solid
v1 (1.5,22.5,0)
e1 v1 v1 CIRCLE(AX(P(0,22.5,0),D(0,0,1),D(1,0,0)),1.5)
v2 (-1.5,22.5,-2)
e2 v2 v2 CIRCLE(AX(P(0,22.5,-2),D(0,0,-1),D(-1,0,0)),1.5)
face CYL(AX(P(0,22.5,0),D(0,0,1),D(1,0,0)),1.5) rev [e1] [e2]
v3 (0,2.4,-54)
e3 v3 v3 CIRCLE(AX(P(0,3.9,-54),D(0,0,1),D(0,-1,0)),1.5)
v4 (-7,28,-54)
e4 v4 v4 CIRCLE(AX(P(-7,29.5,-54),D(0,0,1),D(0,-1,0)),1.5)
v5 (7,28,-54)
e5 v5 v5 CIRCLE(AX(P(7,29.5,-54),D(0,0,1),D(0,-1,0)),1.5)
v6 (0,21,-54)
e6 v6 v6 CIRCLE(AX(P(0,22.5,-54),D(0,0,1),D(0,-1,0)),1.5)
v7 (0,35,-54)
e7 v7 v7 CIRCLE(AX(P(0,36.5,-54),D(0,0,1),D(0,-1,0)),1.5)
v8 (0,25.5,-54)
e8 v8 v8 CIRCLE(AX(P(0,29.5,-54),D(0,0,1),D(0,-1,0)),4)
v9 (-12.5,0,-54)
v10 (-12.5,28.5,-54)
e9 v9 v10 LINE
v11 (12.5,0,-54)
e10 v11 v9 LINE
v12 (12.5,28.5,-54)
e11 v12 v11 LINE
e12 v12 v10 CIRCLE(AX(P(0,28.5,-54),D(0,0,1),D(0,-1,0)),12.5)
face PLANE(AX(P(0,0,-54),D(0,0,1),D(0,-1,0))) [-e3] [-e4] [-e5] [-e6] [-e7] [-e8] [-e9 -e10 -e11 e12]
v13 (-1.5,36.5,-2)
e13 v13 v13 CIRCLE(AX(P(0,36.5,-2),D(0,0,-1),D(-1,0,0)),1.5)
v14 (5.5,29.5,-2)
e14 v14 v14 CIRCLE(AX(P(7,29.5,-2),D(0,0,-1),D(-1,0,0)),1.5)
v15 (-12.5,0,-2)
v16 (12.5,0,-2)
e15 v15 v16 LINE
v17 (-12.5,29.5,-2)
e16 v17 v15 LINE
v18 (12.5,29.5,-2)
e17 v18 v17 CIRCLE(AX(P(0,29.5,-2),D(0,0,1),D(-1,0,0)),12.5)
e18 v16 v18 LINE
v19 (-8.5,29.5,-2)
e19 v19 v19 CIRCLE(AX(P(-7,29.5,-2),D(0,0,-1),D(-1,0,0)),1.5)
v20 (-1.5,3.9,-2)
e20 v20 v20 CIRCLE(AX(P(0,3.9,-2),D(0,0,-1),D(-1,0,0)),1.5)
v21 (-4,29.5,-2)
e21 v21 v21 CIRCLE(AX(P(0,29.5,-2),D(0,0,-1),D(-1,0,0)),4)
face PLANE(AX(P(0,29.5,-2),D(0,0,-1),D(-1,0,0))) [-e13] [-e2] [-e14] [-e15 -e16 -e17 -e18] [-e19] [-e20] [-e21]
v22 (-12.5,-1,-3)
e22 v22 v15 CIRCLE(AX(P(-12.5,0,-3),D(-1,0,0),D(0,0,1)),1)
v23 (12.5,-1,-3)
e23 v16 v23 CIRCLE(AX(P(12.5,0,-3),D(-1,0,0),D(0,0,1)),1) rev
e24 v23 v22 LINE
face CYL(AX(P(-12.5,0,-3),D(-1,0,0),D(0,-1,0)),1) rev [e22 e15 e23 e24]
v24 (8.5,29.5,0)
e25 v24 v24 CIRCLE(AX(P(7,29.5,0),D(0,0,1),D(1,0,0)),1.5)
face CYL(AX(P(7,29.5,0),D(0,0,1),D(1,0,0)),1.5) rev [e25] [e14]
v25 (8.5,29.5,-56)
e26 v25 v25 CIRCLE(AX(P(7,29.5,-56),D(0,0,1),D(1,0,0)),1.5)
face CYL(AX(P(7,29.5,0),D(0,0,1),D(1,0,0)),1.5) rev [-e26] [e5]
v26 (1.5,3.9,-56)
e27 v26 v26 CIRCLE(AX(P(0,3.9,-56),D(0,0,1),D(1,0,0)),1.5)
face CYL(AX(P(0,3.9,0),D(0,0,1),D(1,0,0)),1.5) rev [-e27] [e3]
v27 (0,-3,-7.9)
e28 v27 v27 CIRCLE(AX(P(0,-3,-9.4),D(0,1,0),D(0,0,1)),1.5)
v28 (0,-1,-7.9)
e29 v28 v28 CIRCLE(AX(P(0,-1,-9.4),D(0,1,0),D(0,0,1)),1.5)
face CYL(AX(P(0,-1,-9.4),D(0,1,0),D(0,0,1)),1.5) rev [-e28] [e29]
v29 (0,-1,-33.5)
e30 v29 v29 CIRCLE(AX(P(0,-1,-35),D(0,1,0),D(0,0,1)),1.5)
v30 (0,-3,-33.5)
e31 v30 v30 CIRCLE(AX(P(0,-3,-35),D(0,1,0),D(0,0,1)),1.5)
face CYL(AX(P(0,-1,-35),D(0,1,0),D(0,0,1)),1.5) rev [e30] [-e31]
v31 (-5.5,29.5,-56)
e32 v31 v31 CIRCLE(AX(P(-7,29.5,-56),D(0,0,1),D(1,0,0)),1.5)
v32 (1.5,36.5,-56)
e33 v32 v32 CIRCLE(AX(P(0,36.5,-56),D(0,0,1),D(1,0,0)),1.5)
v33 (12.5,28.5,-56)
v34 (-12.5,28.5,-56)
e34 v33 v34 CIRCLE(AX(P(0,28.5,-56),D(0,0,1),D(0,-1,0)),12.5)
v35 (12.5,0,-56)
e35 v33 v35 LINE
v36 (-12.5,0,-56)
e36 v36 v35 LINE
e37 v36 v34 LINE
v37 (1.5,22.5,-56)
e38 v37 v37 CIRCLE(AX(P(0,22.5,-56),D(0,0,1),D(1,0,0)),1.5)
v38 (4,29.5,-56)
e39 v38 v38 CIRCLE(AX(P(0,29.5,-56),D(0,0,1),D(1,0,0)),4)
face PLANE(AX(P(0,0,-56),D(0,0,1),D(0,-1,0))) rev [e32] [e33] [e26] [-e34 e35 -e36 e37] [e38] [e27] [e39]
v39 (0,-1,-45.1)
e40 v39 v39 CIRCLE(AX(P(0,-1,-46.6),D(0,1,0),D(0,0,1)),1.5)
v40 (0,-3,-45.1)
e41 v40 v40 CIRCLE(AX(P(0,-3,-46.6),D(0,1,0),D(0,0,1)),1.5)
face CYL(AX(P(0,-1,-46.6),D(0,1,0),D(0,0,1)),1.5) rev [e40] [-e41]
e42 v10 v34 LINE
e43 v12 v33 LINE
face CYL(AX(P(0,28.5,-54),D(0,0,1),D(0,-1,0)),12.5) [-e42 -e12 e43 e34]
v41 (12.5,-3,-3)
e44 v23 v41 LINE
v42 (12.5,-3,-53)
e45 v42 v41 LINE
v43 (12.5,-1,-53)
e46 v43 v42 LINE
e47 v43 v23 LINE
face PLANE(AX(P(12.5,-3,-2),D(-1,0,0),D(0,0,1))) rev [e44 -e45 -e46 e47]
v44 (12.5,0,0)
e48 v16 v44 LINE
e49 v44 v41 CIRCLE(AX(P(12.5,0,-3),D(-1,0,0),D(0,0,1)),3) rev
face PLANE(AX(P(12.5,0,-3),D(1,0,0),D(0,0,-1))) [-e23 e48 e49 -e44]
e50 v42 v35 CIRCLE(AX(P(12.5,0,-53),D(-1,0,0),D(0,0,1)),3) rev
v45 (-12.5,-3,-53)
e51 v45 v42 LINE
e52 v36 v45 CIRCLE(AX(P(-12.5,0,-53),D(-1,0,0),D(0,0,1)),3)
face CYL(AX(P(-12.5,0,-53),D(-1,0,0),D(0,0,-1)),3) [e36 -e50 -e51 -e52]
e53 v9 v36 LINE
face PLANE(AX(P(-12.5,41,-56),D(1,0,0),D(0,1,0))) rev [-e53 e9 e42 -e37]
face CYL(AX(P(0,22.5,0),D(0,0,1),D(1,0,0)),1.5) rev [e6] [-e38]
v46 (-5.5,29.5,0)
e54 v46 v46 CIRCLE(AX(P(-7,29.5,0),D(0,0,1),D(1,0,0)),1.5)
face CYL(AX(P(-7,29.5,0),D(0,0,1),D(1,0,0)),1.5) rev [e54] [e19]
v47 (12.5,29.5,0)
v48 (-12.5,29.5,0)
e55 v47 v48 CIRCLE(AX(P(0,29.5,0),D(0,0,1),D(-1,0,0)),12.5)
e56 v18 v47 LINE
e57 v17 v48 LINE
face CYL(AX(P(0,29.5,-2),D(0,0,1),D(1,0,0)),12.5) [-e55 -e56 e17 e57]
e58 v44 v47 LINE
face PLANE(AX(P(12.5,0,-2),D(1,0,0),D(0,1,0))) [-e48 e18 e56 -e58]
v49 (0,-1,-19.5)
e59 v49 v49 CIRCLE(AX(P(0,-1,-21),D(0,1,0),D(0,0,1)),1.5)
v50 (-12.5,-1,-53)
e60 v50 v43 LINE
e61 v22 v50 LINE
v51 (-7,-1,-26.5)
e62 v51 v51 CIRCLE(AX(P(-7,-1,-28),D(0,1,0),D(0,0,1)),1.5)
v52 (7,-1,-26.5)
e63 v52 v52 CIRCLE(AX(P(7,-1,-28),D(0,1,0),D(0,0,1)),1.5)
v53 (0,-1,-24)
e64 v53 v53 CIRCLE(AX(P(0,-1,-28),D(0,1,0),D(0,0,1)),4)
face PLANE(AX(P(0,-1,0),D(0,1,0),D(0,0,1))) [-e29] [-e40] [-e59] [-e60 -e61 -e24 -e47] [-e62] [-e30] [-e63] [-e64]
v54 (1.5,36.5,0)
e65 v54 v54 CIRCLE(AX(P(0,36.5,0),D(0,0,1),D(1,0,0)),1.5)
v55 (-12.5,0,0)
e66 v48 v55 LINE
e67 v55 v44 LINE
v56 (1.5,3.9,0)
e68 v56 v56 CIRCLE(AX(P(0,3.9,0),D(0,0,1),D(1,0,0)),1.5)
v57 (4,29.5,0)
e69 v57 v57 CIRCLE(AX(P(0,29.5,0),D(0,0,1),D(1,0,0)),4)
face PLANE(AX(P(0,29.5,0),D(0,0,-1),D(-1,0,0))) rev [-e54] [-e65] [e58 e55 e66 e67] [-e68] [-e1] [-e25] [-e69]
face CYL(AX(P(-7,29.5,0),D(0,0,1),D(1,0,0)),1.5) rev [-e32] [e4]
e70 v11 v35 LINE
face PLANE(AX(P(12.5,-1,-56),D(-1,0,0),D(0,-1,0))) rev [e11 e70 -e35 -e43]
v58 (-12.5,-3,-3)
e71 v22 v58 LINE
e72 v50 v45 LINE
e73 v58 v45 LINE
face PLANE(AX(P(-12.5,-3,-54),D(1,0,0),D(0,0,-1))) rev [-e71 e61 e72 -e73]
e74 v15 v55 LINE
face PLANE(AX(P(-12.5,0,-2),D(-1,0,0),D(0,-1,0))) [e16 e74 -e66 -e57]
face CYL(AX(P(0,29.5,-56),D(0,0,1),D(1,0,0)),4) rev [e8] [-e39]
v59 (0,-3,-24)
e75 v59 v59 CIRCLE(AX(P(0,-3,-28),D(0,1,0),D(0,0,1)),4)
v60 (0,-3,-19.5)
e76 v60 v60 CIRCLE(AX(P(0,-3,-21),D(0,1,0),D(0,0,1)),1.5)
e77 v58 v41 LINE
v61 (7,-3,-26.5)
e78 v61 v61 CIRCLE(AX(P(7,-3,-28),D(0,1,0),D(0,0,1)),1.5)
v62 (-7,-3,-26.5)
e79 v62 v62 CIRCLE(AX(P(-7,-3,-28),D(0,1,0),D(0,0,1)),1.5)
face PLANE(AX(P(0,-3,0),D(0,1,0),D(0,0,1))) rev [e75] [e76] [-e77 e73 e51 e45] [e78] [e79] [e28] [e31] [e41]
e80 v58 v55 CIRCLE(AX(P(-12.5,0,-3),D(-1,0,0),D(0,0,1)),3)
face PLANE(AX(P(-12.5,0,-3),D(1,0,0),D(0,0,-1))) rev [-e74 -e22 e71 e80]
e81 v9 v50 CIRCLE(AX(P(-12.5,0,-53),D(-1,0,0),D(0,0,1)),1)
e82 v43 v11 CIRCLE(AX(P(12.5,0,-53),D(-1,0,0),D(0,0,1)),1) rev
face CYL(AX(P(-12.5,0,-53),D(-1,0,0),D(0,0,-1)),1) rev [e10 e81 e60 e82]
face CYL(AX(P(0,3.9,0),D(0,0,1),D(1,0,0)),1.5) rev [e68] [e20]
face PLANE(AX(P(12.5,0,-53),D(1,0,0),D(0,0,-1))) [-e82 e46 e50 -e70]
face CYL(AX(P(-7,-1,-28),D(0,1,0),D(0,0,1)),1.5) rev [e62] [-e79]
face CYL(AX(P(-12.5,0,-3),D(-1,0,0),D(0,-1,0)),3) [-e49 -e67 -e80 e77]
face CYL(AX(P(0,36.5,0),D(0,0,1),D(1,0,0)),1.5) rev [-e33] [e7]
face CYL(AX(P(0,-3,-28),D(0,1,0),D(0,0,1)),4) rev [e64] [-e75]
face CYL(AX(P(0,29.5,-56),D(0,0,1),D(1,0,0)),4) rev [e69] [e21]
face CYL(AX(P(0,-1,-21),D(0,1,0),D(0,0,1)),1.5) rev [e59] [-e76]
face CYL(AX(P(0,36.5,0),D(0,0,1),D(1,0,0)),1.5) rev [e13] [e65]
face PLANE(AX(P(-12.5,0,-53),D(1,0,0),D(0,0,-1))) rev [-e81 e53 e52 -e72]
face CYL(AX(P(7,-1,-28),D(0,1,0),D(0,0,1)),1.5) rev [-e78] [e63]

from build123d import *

# Parameters (mm, degrees)
BASE_FLANGE1_DEPTH           = 2
EDGE_FLANGE1_DEPTH           = 25
EDGE_FLANGE2_STRIP_W         = 10
EDGE_FLANGE2_STRIP_H         = 2
EDGE_FLANGE2_STRIP_CUT_DEPTH = 25
EDGE_FLANGE2_DEPTH           = 25
CUT_EXTRUDE1_DEPTH           = 2
SKETCH19_R                   = 4
CUT_EXTRUDE2_DEPTH           = 72.107313267
M3X0_5_TAPPED_HOLE1_D        = 3
SKETCH22_R                   = 4
CUT_EXTRUDE3_DEPTH           = 72.702510416
M3X0_5_TAPPED_HOLE2_D        = 3


# Sheet-metal steps are written as plain solids
with BuildPart() as part:
    # Sketch8 → Base-Flange1 (new body)
    with BuildSketch(Plane.XY):
        with BuildLine():
            Line((-12.5, 0), (12.5, 0))
            Line((12.5, 0), (12.5, 29.5))
            ThreePointArc((12.5, 29.5), (0, 42), (-12.5, 29.5))
            Line((-12.5, 29.5), (-12.5, 0))
        make_face()
    extrude(amount=-BASE_FLANGE1_DEPTH)

    # Edge-Flange1 section (across the edge) → Edge-Flange1 (add)
    with BuildSketch(Plane(origin=(12.5, -1, -2), x_dir=(0, 1, 0), z_dir=(-1, 0, 0))):
        with BuildLine():
            Line((-2, 1), (-2, 52))
            Line((-2, 52), (0, 52))
            Line((0, 52), (0, 1))
            ThreePointArc((0, 1), (0.292893219, 0.292893219), (1, 0))
            Line((1, 0), (1, -2))
            ThreePointArc((1, -2), (-1.121320344, -1.121320344), (-2, 1))
        make_face()
    extrude(amount=EDGE_FLANGE1_DEPTH)

    # Edge-Flange2 strip (across the edge) → Edge-Flange2 strip cut (cut)
    with BuildSketch(Plane(origin=(12.5, -1, -54), x_dir=(0, 0, 1), z_dir=(-1, 0, 0))):
        with Locations((-4, -1)):
            Rectangle(EDGE_FLANGE2_STRIP_W, EDGE_FLANGE2_STRIP_H)
    extrude(amount=EDGE_FLANGE2_STRIP_CUT_DEPTH, mode=Mode.SUBTRACT)

    # Edge-Flange2 section (across the edge) → Edge-Flange2 (add)
    with BuildSketch(Plane(origin=(12.5, -1, -54), x_dir=(0, 0, 1), z_dir=(-1, 0, 0))):
        with BuildLine():
            Line((-2, 1), (-2, 42))
            Line((-2, 42), (0, 42))
            Line((0, 42), (0, 1))
            ThreePointArc((0, 1), (0.292893219, 0.292893219), (1, 0))
            Line((1, 0), (1, -2))
            ThreePointArc((1, -2), (-1.121320344, -1.121320344), (-2, 1))
        make_face()
    extrude(amount=EDGE_FLANGE2_DEPTH)

    # Sketch18 → Cut-Extrude1 (cut)
    with BuildSketch(Plane(origin=(0, 0, -56), x_dir=(-1, 0, 0), z_dir=(0, 0, -1))):
        with BuildLine():
            ThreePointArc((2e-08, 41), (8.838834772, 37.338834758), (12.5, 28.5))
            Line((12.5, 28.5), (12.5, 41))
            Line((12.5, 41), (2e-08, 41))
        make_face()
        with BuildLine():
            ThreePointArc((-12.5, 28.5), (-8.838834758, 37.338834772), (2e-08, 41))
            Line((2e-08, 41), (-12.5, 41))
            Line((-12.5, 41), (-12.5, 28.5))
        make_face()
    extrude(amount=-CUT_EXTRUDE1_DEPTH, mode=Mode.SUBTRACT)

    # Sketch19 → Cut-Extrude2 (cut, through all)
    with BuildSketch(Plane.XY):
        with Locations((0, 29.5)):
            Circle(SKETCH19_R)
    extrude(amount=-CUT_EXTRUDE2_DEPTH, mode=Mode.SUBTRACT)

    # M3x0.5 Tapped Hole1 (through all)
    with Locations(Plane.XY):
        with Locations((0, 36.5), (-7, 29.5), (0, 22.5), (7, 29.5), (0, 3.9), (0, -12.97)):
            Hole(M3X0_5_TAPPED_HOLE1_D / 2)

    # Sketch22 → Cut-Extrude3 (cut, through all)
    with BuildSketch(Plane(origin=(0, -1, 0), x_dir=(1, 0, 0), z_dir=(0, 1, 0))):
        with Locations(Location((0, 28, 0), (0, 0, 270))):
            Circle(SKETCH22_R)
    extrude(amount=-CUT_EXTRUDE3_DEPTH, mode=Mode.SUBTRACT)

    # M3x0.5 Tapped Hole2 (through all)
    with Locations(Plane(origin=(0, -1, 0), x_dir=(1, 0, 0), z_dir=(0, 1, 0))):
        with Locations((7, 28), (-7, 28), (0, 35), (0, 21), (0, 9.4), (0, 46.6)):
            Hole(M3X0_5_TAPPED_HOLE2_D / 2)


solid = part.part
